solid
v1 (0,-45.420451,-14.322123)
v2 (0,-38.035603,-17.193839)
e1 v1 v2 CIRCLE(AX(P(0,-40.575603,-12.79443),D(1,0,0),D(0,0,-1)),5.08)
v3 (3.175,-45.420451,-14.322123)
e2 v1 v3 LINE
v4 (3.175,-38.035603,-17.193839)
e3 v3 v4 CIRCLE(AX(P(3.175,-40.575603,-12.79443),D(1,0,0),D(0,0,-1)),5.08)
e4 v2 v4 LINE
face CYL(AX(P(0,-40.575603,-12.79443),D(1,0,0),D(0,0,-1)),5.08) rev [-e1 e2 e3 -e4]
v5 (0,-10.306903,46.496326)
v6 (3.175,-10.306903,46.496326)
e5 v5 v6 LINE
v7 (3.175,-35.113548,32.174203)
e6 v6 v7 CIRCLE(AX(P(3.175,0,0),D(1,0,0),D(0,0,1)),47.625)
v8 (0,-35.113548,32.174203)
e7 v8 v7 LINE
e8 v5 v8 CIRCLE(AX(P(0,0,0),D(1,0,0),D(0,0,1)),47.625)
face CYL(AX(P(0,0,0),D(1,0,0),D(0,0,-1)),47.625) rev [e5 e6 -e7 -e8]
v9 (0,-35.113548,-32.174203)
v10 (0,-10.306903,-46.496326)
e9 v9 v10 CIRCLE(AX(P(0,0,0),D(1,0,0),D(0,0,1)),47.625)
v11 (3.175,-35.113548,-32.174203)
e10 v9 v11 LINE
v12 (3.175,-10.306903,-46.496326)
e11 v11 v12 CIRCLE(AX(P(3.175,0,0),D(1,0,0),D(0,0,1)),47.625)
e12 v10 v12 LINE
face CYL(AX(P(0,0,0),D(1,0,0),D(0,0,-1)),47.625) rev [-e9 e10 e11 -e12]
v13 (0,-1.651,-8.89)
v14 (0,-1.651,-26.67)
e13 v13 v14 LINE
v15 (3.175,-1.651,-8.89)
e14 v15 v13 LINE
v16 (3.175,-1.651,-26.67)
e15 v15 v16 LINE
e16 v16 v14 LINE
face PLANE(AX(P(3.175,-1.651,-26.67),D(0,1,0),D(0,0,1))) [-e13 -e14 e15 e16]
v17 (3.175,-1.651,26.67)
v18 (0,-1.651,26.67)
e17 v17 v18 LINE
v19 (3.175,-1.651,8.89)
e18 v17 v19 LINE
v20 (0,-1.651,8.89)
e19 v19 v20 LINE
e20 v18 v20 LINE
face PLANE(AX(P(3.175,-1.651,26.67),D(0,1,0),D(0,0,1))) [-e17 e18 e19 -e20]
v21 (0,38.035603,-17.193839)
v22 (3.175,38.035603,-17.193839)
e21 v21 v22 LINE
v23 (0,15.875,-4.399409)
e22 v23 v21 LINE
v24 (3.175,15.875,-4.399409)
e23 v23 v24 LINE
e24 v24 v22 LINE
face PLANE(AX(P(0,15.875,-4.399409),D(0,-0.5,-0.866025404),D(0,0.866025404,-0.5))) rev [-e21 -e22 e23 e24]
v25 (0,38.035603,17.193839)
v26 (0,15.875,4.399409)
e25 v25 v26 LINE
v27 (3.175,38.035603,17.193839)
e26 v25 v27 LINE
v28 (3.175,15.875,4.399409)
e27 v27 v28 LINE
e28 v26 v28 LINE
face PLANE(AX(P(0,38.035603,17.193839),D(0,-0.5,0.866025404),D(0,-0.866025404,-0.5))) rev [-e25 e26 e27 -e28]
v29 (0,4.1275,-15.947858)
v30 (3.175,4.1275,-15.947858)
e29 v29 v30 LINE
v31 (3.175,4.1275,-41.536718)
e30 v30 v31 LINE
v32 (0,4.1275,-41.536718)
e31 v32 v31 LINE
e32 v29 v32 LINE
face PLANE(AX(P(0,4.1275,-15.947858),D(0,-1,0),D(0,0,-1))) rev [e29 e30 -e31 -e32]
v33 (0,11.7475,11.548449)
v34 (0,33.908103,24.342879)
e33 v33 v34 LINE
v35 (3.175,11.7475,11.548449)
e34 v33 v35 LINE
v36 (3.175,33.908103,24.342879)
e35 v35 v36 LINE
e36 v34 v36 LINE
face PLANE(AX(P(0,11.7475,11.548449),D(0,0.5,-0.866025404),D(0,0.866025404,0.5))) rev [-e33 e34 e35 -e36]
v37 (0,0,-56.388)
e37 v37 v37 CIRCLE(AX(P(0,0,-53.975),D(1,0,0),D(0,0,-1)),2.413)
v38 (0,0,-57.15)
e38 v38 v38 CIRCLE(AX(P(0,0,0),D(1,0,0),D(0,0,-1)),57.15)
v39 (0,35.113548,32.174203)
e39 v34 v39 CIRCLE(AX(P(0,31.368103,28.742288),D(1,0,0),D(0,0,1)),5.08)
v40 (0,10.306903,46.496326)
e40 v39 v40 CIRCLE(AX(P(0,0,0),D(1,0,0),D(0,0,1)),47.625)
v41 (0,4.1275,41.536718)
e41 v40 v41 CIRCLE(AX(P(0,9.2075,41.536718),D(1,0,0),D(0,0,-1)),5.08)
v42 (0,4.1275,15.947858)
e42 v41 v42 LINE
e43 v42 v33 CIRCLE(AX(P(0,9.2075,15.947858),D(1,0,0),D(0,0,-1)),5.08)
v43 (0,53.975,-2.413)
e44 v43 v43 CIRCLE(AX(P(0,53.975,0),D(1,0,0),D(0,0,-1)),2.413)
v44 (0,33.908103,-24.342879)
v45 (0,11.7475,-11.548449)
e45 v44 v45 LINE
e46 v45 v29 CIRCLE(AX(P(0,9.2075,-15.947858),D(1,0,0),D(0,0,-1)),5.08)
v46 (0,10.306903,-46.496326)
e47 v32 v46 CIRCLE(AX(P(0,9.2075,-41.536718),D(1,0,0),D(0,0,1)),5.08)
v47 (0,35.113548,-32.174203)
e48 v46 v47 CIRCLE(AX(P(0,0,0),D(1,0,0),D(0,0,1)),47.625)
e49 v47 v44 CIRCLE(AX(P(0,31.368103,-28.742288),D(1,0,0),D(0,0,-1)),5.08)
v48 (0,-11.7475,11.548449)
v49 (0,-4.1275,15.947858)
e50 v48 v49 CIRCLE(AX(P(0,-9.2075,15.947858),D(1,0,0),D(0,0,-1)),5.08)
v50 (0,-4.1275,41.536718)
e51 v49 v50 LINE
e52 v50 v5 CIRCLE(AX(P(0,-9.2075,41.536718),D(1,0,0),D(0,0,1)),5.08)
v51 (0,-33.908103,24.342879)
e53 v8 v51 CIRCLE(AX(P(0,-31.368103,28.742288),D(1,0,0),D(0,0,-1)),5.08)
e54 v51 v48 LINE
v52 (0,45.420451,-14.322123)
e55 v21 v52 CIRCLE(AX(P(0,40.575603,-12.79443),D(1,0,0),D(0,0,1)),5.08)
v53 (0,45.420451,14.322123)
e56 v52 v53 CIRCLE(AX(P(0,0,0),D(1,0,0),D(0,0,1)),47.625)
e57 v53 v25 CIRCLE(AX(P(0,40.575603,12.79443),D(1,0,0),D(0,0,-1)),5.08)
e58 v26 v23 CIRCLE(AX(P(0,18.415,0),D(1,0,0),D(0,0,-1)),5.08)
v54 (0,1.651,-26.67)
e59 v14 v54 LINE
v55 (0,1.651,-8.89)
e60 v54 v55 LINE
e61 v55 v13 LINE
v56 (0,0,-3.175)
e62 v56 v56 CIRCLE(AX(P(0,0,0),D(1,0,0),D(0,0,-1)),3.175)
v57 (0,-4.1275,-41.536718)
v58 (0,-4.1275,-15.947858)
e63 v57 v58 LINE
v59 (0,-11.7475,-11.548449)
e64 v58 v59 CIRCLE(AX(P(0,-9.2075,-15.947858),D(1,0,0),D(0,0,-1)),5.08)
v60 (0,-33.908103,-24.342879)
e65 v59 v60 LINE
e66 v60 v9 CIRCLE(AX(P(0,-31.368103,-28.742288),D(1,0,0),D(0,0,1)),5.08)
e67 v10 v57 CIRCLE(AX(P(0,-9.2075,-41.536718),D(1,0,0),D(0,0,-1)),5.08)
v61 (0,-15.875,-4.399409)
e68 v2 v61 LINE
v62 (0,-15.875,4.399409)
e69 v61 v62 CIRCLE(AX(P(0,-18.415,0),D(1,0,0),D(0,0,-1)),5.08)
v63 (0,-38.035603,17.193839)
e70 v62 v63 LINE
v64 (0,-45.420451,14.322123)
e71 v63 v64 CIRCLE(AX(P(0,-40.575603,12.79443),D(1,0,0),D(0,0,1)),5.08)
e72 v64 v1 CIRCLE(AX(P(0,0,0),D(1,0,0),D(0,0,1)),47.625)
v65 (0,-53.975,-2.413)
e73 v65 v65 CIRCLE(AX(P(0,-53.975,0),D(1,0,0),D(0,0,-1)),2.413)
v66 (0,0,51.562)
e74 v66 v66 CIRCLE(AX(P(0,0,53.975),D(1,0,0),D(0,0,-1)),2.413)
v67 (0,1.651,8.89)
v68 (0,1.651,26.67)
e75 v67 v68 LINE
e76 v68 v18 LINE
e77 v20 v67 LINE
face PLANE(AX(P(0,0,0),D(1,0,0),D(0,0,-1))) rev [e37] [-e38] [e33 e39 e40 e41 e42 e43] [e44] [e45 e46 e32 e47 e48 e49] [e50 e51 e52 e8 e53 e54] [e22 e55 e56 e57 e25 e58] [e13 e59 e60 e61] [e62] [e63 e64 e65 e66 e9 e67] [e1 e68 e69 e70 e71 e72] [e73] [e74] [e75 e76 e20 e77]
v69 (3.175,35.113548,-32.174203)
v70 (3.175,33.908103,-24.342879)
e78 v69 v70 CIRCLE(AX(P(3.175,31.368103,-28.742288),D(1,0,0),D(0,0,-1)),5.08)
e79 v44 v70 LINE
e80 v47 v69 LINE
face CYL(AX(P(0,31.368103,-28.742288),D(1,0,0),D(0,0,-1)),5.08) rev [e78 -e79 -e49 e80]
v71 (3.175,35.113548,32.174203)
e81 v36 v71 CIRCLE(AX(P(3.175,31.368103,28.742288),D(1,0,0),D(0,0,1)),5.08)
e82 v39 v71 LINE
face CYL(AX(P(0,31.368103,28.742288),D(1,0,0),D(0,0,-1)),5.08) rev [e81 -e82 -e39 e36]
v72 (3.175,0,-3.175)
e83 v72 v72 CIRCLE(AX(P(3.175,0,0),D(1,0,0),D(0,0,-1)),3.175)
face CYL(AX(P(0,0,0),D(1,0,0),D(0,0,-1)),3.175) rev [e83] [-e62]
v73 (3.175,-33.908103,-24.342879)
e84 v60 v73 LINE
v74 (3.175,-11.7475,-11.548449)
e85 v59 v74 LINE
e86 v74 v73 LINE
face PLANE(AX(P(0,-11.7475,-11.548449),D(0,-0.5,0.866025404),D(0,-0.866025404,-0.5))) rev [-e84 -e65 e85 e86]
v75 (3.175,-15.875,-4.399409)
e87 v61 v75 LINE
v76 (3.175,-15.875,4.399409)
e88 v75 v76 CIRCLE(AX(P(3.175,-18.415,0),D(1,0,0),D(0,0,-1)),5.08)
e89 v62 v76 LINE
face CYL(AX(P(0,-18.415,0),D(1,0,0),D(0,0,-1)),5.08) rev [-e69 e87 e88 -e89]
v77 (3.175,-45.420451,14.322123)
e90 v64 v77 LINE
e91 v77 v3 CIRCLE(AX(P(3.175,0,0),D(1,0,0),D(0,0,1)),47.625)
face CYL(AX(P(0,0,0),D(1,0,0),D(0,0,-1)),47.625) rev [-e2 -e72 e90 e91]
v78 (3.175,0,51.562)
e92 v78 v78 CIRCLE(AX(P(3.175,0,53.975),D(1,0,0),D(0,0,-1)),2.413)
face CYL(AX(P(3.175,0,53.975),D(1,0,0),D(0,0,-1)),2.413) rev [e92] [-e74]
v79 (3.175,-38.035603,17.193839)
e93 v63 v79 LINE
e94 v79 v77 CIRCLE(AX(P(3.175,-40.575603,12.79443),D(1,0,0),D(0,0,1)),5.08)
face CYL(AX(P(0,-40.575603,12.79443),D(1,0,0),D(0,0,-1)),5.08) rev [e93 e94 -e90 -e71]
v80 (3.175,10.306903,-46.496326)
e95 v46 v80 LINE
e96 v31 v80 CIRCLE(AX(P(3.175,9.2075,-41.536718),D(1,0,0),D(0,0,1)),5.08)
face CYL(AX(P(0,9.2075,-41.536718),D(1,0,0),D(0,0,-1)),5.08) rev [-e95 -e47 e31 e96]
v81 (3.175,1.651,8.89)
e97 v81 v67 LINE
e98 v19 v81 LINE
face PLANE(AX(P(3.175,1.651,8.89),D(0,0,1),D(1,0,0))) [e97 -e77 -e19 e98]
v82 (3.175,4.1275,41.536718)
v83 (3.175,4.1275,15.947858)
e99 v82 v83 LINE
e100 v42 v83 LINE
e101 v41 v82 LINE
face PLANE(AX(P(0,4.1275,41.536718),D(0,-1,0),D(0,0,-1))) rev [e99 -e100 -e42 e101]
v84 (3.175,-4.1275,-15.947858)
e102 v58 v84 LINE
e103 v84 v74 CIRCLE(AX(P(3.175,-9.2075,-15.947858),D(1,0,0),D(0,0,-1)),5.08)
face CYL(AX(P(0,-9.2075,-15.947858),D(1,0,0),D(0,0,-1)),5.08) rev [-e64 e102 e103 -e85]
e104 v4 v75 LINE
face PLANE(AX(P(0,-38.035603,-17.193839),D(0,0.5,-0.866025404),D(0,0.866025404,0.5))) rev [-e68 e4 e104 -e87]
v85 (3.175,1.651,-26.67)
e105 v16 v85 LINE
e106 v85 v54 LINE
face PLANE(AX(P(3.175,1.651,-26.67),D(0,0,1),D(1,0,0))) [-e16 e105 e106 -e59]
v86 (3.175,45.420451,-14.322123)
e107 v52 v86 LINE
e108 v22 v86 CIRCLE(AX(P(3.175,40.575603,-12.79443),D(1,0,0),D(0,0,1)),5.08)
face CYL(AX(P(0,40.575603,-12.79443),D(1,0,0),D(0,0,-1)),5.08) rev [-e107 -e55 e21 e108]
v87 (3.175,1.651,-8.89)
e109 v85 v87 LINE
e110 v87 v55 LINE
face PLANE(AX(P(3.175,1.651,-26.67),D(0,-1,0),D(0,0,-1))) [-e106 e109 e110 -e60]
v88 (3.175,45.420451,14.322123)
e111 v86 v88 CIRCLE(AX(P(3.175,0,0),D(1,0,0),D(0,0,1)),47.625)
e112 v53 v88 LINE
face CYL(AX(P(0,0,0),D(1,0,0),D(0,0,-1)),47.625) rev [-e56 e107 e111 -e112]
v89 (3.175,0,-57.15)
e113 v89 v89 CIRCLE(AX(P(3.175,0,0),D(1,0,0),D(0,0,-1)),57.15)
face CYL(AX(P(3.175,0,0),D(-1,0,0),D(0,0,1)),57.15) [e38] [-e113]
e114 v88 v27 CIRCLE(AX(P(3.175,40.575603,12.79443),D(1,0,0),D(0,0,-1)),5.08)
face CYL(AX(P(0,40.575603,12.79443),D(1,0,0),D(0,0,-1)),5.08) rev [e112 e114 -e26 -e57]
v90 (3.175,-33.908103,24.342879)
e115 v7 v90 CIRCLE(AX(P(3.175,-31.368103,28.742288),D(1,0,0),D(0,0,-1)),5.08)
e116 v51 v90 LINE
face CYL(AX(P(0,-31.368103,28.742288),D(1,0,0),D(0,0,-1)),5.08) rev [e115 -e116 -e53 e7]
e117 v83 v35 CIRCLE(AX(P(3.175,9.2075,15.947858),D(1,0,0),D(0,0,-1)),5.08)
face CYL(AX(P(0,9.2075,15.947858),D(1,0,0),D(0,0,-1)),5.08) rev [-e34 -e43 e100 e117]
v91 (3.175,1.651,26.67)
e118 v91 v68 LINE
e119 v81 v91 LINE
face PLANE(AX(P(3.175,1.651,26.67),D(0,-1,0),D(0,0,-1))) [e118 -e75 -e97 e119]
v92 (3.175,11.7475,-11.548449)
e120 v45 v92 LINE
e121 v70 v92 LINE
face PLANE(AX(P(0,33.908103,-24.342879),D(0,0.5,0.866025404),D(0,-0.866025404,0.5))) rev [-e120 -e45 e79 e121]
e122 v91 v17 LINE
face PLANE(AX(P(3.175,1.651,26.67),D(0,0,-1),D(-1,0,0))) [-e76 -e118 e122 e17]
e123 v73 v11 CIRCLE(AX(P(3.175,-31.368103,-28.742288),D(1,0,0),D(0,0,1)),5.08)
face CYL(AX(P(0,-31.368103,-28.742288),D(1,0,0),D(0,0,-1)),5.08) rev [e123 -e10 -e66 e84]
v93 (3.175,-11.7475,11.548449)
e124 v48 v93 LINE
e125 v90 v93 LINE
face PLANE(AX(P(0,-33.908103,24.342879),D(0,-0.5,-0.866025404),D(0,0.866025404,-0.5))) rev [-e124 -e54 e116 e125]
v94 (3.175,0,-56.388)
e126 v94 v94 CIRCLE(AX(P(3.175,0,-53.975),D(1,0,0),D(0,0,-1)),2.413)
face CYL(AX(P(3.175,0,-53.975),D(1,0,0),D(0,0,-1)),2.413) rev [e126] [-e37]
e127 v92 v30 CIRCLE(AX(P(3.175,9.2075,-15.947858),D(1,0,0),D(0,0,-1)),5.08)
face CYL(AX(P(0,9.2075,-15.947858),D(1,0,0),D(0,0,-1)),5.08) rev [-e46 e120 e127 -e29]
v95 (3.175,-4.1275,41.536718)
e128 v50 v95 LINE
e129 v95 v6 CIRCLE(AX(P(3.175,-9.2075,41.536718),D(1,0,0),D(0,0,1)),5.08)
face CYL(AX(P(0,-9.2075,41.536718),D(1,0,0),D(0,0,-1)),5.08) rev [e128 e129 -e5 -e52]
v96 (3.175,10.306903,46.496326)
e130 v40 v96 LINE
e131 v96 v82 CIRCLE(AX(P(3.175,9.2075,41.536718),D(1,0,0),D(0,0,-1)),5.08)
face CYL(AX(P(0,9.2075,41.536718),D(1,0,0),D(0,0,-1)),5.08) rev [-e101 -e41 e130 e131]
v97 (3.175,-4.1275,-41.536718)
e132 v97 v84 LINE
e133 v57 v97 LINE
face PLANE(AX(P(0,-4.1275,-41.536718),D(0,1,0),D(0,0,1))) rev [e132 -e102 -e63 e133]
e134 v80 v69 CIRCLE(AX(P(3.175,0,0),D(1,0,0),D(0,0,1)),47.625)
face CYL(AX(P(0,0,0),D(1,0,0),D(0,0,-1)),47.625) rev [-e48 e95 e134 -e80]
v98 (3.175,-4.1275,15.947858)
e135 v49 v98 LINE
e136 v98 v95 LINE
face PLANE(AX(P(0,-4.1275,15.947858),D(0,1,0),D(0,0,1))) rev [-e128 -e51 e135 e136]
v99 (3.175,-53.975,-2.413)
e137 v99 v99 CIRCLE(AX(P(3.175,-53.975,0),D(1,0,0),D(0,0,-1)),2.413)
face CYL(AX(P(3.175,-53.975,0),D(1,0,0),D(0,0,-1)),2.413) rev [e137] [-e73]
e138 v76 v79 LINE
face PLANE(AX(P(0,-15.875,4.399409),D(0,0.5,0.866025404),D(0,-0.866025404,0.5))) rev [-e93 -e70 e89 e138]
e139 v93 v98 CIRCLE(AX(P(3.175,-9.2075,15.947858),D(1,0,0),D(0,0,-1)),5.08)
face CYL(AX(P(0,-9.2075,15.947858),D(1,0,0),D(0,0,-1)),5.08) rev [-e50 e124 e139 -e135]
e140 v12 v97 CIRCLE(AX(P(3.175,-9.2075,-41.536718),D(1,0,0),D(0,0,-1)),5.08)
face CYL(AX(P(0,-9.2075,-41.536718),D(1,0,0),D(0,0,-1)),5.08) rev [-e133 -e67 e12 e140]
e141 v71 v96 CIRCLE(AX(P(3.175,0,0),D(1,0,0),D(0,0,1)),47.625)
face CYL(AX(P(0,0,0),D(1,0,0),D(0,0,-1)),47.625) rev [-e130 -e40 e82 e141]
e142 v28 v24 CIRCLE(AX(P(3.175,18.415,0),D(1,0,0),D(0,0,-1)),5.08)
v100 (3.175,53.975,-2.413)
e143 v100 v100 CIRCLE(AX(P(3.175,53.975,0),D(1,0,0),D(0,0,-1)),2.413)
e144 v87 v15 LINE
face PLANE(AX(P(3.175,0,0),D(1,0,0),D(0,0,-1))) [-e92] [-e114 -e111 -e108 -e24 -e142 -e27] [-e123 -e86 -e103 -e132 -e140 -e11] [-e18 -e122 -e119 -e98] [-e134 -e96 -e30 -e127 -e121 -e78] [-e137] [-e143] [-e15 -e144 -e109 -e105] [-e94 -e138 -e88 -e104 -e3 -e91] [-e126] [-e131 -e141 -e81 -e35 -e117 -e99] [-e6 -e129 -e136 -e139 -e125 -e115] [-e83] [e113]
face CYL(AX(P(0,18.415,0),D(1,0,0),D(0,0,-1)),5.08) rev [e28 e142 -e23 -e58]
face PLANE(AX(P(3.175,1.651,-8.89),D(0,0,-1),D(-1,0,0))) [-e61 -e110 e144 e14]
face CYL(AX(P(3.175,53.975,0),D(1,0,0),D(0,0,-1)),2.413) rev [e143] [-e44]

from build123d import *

# Parameters (mm, degrees)
SKETCH1_R              = 57.15
SKETCH1_W              = 17.78
SKETCH1_H              = 3.302
BOSS_EXTRUDE1_DEPTH    = 3.175
CUT_EXTRUDE1_START     = -3.175
CUT_EXTRUDE1_OUTLINE_R = 3.175
CUT_EXTRUDE1_DEPTH     = 3.175
F_10_24_TAPPED_HOLE1_D = 4.826


# Read off the part's stored shape, not the designer's step: Cut-Extrude1
with BuildPart() as part:
    # Sketch1 → Boss-Extrude1 (new body)
    with BuildSketch(Plane(origin=(0, 0, 0), x_dir=(0, 0, -1), z_dir=(1, 0, 0))):
        Circle(SKETCH1_R)
        with Locations((-17.78, 0)):
            Rectangle(SKETCH1_W, SKETCH1_H, mode=Mode.SUBTRACT)
        with Locations((17.78, 0)):
            Rectangle(SKETCH1_W, SKETCH1_H, mode=Mode.SUBTRACT)
    extrude(amount=BOSS_EXTRUDE1_DEPTH)

    # Cut-Extrude1 outline → Cut-Extrude1 (cut)
    with BuildSketch(Plane(origin=(3.175, 0, 0), x_dir=(0, 0, -1), z_dir=(1, 0, 0)).offset(CUT_EXTRUDE1_START)):
        with BuildLine():
            Line((-17.193839306, 38.035603254), (-4.399409051, 15.875))
            ThreePointArc((-4.399409051, 15.875), (0, 13.335), (4.399409051, 15.875))
            Line((4.399409051, 15.875), (17.193839306, 38.035603254))
            ThreePointArc((17.193839306, 38.035603254), (17.529050695, 42.416735863), (14.322123419, 45.420451404))
            ThreePointArc((14.322123419, 45.420451404), (0, 47.625), (-14.322123419, 45.420451404))
            ThreePointArc((-14.322123419, 45.420451404), (-17.529050695, 42.416735863), (-17.193839306, 38.035603254))
        make_face()
        with BuildLine():
            ThreePointArc((15.947857811, -4.1275), (11.548448759, -6.6675), (11.548448759, -11.7475))
            Line((11.548448759, -11.7475), (24.342879014, -33.908103254))
            ThreePointArc((24.342879014, -33.908103254), (27.969445455, -36.388971138), (32.174203058, -35.113548419))
            ThreePointArc((32.174203058, -35.113548419), (41.244459855, -23.8125), (46.496326477, -10.306902985))
            ThreePointArc((46.496326477, -10.306902985), (45.49849615, -6.027764725), (41.536718319, -4.1275))
            Line((41.536718319, -4.1275), (15.947857811, -4.1275))
        make_face()
        with BuildLine():
            ThreePointArc((-24.342879014, 33.908103254), (-27.969445455, 36.388971138), (-32.174203058, 35.113548419))
            ThreePointArc((-32.174203058, 35.113548419), (-41.244459855, 23.8125), (-46.496326477, 10.306902985))
            ThreePointArc((-46.496326477, 10.306902985), (-45.49849615, 6.027764725), (-41.536718319, 4.1275))
            Line((-41.536718319, 4.1275), (-15.947857811, 4.1275))
            ThreePointArc((-15.947857811, 4.1275), (-11.548448759, 6.6675), (-11.548448759, 11.7475))
            Line((-11.548448759, 11.7475), (-24.342879014, 33.908103254))
        make_face()
        with BuildLine():
            ThreePointArc((-41.536718319, -4.1275), (-45.49849615, -6.027764725), (-46.496326477, -10.306902985))
            ThreePointArc((-46.496326477, -10.306902985), (-41.244459855, -23.8125), (-32.174203058, -35.113548419))
            ThreePointArc((-32.174203058, -35.113548419), (-27.969445455, -36.388971138), (-24.342879014, -33.908103254))
            Line((-24.342879014, -33.908103254), (-11.548448759, -11.7475))
            ThreePointArc((-11.548448759, -11.7475), (-11.548448759, -6.6675), (-15.947857811, -4.1275))
            Line((-15.947857811, -4.1275), (-41.536718319, -4.1275))
        make_face()
        with BuildLine():
            ThreePointArc((-17.193839306, -38.035603254), (-17.529050695, -42.416735863), (-14.322123419, -45.420451404))
            ThreePointArc((-14.322123419, -45.420451404), (0, -47.625), (14.322123419, -45.420451404))
            ThreePointArc((14.322123419, -45.420451404), (17.529050695, -42.416735863), (17.193839306, -38.035603254))
            Line((17.193839306, -38.035603254), (4.399409051, -15.875))
            ThreePointArc((4.399409051, -15.875), (0, -13.335), (-4.399409051, -15.875))
            Line((-4.399409051, -15.875), (-17.193839306, -38.035603254))
        make_face()
        with BuildLine():
            ThreePointArc((41.536718319, 4.1275), (45.49849615, 6.027764725), (46.496326477, 10.306902985))
            ThreePointArc((46.496326477, 10.306902985), (41.244459855, 23.8125), (32.174203058, 35.113548419))
            ThreePointArc((32.174203058, 35.113548419), (27.969445455, 36.388971138), (24.342879014, 33.908103254))
            Line((24.342879014, 33.908103254), (11.548448759, 11.7475))
            ThreePointArc((11.548448759, 11.7475), (11.548448759, 6.6675), (15.947857811, 4.1275))
            Line((15.947857811, 4.1275), (41.536718319, 4.1275))
        make_face()
        Circle(CUT_EXTRUDE1_OUTLINE_R)
    extrude(amount=CUT_EXTRUDE1_DEPTH, mode=Mode.SUBTRACT)

    # #10-24 Tapped Hole1 (through all)
    with Locations(Plane(origin=(3.175, 0, 0), x_dir=(0, 0, -1), z_dir=(1, 0, 0))):
        with Locations((-53.975, 0), (0, 53.975), (53.975, 0), (0, -53.975)):
            Hole(F_10_24_TAPPED_HOLE1_D / 2)


solid = part.part
